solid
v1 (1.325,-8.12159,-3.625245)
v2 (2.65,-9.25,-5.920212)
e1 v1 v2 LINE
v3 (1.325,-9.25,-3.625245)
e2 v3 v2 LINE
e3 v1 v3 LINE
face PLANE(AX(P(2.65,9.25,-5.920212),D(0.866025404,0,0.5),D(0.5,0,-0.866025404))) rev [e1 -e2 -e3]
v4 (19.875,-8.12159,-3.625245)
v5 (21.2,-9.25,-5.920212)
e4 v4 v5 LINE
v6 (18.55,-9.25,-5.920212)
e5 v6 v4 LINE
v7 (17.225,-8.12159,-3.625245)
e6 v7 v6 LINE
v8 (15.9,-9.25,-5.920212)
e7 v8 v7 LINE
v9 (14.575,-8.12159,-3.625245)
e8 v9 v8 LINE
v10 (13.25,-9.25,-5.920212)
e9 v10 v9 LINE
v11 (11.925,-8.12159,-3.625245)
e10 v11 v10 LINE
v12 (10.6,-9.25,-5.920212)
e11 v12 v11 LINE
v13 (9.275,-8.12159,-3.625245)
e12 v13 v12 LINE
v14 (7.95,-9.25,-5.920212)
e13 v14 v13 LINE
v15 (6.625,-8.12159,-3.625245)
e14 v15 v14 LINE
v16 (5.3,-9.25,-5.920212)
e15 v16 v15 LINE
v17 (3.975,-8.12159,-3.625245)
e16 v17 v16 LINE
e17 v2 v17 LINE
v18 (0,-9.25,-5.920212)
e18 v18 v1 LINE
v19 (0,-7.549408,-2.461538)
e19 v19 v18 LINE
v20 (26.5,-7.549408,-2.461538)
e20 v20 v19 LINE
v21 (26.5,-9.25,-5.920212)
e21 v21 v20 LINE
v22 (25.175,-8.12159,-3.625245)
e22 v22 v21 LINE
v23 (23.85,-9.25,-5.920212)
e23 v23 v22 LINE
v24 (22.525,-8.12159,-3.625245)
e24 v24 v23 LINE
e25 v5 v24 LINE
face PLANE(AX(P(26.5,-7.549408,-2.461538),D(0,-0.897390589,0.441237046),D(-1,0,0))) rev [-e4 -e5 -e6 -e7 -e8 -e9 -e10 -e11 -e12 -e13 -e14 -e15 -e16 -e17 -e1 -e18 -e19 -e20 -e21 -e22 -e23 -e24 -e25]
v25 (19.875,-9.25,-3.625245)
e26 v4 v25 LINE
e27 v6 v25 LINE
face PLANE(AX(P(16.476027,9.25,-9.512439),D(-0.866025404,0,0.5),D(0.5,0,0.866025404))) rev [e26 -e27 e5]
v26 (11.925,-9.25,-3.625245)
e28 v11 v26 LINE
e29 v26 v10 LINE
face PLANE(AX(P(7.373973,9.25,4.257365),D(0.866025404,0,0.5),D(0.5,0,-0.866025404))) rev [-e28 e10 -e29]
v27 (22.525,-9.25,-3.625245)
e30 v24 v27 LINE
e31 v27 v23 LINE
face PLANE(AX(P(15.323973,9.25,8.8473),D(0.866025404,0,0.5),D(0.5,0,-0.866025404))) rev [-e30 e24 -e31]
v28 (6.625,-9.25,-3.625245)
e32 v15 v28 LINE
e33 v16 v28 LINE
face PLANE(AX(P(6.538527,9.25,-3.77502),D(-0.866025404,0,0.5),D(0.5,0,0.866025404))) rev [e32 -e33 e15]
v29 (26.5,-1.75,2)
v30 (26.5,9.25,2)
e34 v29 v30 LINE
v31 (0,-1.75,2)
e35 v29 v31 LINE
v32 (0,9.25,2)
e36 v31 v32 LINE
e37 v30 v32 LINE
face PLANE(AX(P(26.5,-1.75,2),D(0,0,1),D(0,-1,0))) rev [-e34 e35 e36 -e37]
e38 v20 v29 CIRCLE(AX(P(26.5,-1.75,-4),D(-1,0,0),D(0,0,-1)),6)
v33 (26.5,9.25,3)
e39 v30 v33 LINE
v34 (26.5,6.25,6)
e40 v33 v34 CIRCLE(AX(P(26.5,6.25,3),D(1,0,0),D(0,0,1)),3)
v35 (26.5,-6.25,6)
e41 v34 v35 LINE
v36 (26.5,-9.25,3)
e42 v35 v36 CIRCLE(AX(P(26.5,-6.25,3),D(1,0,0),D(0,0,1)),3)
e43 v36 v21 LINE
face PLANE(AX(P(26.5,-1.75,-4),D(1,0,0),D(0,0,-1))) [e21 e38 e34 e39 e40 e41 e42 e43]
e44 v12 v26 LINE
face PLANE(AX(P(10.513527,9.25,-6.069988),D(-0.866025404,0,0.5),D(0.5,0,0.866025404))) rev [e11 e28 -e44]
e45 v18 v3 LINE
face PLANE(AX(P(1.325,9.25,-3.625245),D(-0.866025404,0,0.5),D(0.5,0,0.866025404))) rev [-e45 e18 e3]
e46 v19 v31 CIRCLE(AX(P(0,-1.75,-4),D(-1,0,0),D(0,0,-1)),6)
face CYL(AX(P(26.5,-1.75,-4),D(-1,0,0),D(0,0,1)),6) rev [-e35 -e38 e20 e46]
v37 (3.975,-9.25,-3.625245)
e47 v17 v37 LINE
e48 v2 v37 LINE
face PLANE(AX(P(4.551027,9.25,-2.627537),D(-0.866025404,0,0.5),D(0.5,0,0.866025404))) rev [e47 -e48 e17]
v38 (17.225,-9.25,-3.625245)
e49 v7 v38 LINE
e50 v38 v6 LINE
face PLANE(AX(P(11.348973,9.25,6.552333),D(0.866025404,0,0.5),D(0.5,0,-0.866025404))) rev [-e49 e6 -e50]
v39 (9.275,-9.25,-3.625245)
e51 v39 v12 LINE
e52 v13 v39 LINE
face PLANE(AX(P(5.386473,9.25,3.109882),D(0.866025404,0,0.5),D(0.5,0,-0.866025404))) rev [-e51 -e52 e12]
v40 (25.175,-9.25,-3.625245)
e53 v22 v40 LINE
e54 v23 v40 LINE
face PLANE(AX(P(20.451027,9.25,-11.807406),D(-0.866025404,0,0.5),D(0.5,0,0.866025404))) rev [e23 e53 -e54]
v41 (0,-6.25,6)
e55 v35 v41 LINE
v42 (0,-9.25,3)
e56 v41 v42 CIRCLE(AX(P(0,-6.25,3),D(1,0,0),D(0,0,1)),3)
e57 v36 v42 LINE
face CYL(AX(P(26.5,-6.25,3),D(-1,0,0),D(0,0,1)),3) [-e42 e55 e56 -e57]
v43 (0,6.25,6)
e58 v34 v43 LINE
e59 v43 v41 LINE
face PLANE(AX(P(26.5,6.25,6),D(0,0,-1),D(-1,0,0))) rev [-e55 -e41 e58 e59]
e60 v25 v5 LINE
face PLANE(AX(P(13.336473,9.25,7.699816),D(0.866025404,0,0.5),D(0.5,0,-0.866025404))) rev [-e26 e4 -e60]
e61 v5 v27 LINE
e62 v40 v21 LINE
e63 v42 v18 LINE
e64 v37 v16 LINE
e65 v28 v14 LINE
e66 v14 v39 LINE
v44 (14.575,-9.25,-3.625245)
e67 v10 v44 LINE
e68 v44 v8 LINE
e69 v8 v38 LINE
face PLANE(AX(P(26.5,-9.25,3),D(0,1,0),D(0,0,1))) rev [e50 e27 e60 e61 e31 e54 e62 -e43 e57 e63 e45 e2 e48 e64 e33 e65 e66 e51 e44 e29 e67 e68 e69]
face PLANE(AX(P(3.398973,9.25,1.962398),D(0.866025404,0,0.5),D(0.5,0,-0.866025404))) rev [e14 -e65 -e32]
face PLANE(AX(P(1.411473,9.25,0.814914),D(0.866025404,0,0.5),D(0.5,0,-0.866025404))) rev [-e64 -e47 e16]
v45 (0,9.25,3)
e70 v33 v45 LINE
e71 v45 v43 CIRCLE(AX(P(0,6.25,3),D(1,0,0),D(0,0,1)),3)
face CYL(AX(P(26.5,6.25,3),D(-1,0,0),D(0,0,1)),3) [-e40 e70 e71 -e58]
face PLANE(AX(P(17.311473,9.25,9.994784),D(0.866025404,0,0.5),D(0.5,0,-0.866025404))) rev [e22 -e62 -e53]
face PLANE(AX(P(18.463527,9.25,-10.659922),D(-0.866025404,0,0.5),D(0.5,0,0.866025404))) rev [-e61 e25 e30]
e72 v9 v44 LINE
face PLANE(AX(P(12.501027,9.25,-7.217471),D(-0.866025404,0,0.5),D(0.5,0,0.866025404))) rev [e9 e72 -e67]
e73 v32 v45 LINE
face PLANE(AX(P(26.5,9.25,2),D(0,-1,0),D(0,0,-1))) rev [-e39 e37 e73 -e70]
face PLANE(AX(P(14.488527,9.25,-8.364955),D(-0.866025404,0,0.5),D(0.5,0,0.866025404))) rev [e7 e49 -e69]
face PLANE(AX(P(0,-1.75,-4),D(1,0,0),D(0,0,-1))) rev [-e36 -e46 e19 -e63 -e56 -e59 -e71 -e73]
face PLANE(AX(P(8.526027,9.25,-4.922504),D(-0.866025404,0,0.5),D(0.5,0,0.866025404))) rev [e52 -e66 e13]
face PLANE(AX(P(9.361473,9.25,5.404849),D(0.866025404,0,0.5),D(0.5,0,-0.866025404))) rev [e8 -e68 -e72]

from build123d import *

# Parameters (mm, degrees)
BOSS_EXTRUDE1_DEPTH     = 26.5
CHAMFER1_START          = -5.68864596
CHAMFER1_OUTLINE_W      = 26.5
CHAMFER1_OUTLINE_H      = 7
CHAMFER1_DEPTH          = 3.235738337
CUT_EXTRUDE1_DEPTH      = 33.870959828
CUT_EXTRUDE1_DEPTH_BACK = 33.870959828


with BuildPart() as part:
    # Sketch1 → Boss-Extrude1 (new body)
    with BuildSketch(Plane(origin=(0, 0, 0), x_dir=(0, 0, -1), z_dir=(1, 0, 0))):
        with BuildLine():
            Line((-2, 9.25), (-3, 9.25))
            ThreePointArc((-3, 9.25), (-5.121320344, 8.371320344), (-6, 6.25))
            Line((-6, 6.25), (-6, -6.25))
            ThreePointArc((-6, -6.25), (-5.121320344, -8.371320344), (-3, -9.25))
            Line((-3, -9.25), (6, -9.25))
            Line((6, -9.25), (6, -7.75))
            Line((6, -7.75), (4, -7.75))
            ThreePointArc((4, -7.75), (-0.242640687, -5.992640687), (-2, -1.75))
            Line((-2, -1.75), (-2, 9.25))
        make_face()
    extrude(amount=BOSS_EXTRUDE1_DEPTH)

    # Chamfer1: read off the stored shape, not the designer's step
    # Chamfer1 outline → Chamfer1 (cut)
    with BuildSketch(Plane(origin=(0, 0, 0), x_dir=(1, 0, 0), z_dir=(0, 0.897390589003635, -0.441237046005556)).offset(CHAMFER1_START)):
        with Locations((13.25, 7.5)):
            Rectangle(CHAMFER1_OUTLINE_W, CHAMFER1_OUTLINE_H)
    extrude(amount=CHAMFER1_DEPTH, mode=Mode.SUBTRACT)

    # Sketch2 → Cut-Extrude1 (cut, two sides: drawn at the far end of the back side and taken through both)
    with BuildSketch(Plane.XZ.offset(9.25).offset(-CUT_EXTRUDE1_DEPTH_BACK)):
        Polygon((23.85, -5.920212303), (26.5, -5.920212303), (25.175, -3.625244983), align=None)
        Polygon((21.2, -5.920212303), (23.85, -5.920212303), (22.525, -3.625244983), align=None)
        Polygon((18.55, -5.920212303), (21.2, -5.920212303), (19.875, -3.625244983), align=None)
        Polygon((15.9, -5.920212303), (18.55, -5.920212303), (17.225, -3.625244983), align=None)
        Polygon((13.25, -5.920212303), (15.9, -5.920212303), (14.575, -3.625244983), align=None)
        Polygon((10.6, -5.920212303), (13.25, -5.920212303), (11.925, -3.625244983), align=None)
        Polygon((7.95, -5.920212303), (10.6, -5.920212303), (9.275, -3.625244983), align=None)
        Polygon((5.3, -5.920212303), (7.95, -5.920212303), (6.625, -3.625244983), align=None)
        Polygon((2.65, -5.920212303), (5.3, -5.920212303), (3.975, -3.625244983), align=None)
        Polygon((2.65, -5.920212303), (1.325, -3.625244983), (0, -5.920212303), align=None)
    extrude(amount=CUT_EXTRUDE1_DEPTH + CUT_EXTRUDE1_DEPTH_BACK, mode=Mode.SUBTRACT)


solid = part.part
